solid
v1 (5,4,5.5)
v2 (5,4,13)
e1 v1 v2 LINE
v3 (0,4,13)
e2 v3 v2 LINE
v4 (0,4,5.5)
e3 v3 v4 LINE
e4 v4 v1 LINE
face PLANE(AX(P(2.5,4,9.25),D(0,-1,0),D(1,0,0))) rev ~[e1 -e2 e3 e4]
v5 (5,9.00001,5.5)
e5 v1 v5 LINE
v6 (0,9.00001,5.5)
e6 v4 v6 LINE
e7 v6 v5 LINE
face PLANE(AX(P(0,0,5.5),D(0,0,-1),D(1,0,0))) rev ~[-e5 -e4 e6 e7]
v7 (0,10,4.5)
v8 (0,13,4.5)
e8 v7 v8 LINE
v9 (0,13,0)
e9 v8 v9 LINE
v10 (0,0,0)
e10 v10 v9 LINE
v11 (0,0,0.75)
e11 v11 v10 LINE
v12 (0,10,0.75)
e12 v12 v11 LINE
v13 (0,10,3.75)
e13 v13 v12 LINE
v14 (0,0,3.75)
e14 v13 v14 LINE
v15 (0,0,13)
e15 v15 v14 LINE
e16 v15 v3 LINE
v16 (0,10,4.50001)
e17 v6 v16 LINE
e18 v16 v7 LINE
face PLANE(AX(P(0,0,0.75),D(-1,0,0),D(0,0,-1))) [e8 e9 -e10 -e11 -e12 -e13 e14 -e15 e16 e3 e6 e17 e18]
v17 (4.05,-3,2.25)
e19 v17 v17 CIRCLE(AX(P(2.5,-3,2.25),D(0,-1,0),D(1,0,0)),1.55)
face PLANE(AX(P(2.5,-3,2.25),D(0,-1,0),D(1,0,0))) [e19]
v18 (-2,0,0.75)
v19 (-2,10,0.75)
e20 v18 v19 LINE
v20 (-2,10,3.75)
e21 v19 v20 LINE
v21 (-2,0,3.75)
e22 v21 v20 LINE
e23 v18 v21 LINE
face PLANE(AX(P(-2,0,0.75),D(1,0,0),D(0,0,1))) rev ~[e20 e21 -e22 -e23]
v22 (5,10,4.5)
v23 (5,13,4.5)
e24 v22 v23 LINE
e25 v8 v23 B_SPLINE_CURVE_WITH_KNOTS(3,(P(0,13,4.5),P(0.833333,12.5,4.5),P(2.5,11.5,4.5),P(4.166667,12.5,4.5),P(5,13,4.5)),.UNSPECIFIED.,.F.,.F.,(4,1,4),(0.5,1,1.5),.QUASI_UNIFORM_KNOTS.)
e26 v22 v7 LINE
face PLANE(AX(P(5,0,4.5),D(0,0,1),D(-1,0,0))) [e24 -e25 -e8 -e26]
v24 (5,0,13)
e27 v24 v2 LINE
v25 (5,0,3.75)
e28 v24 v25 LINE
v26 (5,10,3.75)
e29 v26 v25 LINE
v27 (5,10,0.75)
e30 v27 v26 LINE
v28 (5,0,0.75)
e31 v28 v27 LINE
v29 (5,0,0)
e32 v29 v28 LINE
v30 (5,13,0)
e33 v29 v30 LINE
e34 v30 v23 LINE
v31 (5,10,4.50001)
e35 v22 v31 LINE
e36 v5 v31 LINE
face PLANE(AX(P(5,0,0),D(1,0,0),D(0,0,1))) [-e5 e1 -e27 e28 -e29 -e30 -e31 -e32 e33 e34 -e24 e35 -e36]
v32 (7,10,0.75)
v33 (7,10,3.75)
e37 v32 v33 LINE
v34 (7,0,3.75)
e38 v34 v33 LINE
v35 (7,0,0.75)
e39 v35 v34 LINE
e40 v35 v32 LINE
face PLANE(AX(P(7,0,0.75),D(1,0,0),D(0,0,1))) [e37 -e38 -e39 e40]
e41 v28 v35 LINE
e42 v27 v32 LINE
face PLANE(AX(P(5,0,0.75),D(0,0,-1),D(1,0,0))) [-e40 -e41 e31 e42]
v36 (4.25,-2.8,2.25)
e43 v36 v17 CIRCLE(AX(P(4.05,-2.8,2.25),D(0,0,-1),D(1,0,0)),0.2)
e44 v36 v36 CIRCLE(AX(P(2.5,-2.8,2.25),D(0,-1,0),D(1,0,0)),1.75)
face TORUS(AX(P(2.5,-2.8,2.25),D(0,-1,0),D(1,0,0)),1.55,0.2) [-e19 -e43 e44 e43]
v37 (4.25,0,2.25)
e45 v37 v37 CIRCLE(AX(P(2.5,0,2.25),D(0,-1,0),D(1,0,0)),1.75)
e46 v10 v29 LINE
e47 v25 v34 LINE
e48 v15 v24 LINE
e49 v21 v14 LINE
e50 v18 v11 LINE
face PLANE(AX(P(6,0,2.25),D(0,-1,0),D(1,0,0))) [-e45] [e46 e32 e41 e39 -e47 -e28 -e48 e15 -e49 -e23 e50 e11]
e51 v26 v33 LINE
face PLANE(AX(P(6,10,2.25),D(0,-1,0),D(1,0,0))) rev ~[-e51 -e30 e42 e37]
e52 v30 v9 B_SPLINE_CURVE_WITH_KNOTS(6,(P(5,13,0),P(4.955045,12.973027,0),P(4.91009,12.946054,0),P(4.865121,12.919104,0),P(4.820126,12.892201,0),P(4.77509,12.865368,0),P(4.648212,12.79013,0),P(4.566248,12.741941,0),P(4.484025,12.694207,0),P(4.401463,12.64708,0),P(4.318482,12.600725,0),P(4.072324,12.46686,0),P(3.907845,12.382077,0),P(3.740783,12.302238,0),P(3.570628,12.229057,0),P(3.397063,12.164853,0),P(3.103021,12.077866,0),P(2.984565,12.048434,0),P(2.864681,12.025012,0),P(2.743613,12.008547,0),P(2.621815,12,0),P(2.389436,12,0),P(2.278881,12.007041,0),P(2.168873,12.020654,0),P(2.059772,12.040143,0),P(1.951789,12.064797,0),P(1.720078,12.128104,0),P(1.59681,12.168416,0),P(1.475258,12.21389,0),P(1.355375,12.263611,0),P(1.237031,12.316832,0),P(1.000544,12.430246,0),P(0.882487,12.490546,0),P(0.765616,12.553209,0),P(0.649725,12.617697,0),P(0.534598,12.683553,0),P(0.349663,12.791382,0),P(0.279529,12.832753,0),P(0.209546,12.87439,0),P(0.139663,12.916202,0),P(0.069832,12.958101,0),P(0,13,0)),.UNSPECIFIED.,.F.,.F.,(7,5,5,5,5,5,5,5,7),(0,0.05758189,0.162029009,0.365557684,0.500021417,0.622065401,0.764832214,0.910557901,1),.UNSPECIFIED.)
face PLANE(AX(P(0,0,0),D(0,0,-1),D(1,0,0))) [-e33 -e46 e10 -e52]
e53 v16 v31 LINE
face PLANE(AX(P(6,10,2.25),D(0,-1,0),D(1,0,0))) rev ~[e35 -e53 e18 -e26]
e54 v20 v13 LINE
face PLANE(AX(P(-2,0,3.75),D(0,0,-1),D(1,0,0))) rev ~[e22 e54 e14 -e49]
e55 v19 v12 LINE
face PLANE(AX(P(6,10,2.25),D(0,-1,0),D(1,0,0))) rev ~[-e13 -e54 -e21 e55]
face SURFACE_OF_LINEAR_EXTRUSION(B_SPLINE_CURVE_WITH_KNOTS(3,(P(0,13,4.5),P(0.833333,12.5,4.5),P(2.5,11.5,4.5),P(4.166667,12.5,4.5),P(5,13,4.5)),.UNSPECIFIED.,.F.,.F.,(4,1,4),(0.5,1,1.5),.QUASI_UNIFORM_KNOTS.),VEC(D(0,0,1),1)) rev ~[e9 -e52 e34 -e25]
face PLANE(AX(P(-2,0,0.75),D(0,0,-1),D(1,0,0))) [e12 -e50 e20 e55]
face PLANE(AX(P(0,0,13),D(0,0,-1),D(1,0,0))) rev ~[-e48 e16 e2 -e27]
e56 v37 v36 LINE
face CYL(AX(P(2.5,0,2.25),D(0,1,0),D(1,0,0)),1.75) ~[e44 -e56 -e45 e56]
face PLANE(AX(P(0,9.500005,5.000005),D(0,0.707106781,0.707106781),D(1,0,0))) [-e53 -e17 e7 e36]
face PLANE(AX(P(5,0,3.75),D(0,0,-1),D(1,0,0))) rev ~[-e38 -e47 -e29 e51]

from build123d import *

# Parameters (mm, degrees)
F0_W     = 5
F0_H     = 7.5
F0_R     = 1.75
F0_H_2   = 1
F1_DEPTH = 4
F2_DEPTH = 3
F0_W_2   = 2
F0_H_3   = 3
F3_DEPTH = 10
F4_DEPTH = 13
F5_SIZE  = 0.99999
F7_DEPTH = 4.501
F8_R     = 0.2


# Not quite as in the source:
# - a fillet or chamfer is up to 0.001 mm smaller than in the source, because OpenCascade refuses the exact size


with BuildPart() as f1:
    # F0 (on Front) → F1 (new body)
    with BuildSketch(Plane.XZ):
        with Locations((2.5, 9.25)):
            Rectangle(F0_W, F0_H)
        Polygon((0, 0.75), (0, 0), (5, 0), (5, 0.75), (5, 3.75), (5, 4.5), (0, 4.5), (0, 3.75), align=None)
        with Locations((2.5, 2.25)):
            Circle(F0_R, mode=Mode.SUBTRACT)
        with Locations((2.5, 2.25)):
            Circle(F0_R)
        with Locations((2.5, 5)):
            Rectangle(F0_W, F0_H_2)
    extrude(amount=-F1_DEPTH)

    # F0 (on Front) → F2 (join)
    with BuildSketch(Plane.XZ):
        with Locations((2.5, 2.25)):
            Circle(F0_R)
    extrude(amount=F2_DEPTH)

    # F0 (on Front) → F3 (join)
    with BuildSketch(Plane.XZ):
        with Locations((6, 2.25)):
            Rectangle(F0_W_2, F0_H_3)
        with Locations((-1, 2.25)):
            Rectangle(F0_W_2, F0_H_3)
        with Locations((2.5, 5)):
            Rectangle(F0_W, F0_H_2)
        Polygon((0, 0.75), (0, 0), (5, 0), (5, 0.75), (5, 3.75), (5, 4.5), (0, 4.5), (0, 3.75), align=None)
        with Locations((2.5, 2.25)):
            Circle(F0_R, mode=Mode.SUBTRACT)
        with Locations((2.5, 2.25)):
            Circle(F0_R)
    extrude(amount=-F3_DEPTH)

    # F0 (on Front) → F4 (join)
    with BuildSketch(Plane.XZ):
        Polygon((0, 0.75), (0, 0), (5, 0), (5, 0.75), (5, 3.75), (5, 4.5), (0, 4.5), (0, 3.75), align=None)
        with Locations((2.5, 2.25)):
            Circle(F0_R, mode=Mode.SUBTRACT)
        with Locations((2.5, 2.25)):
            Circle(F0_R)
    extrude(amount=-F4_DEPTH)

    # F5 (size 1 in the source; OpenCascade refuses exactly that, so slightly less here)
    f5_edges = [f1.edges().sort_by_distance(p)[0] for p in [
        (2.5, 10, 5.5),
    ]]
    chamfer(f5_edges, length=F5_SIZE)

    # F6 (on face) → F7 (cut, through all)
    with BuildSketch(Plane.XY.offset(4.5)):
        with BuildLine():
            Line((5, 13), (2.5, 13))
            Line((2.5, 13), (2.5, 12))
            add(Edge.make_bspline(
                [(5, 13), (4.1666666667, 12.5), (3.3333333333, 12), (2.5, 12)],
                knots=[0, 0, 0, 0, 0.5, 0.5, 0.5, 0.5], degree=3))
        make_face()
        with BuildLine():
            Line((2.5, 12), (2.5, 13))
            Line((2.5, 13), (0, 13))
            add(Edge.make_bspline(
                [(2.5, 12), (1.6666666667, 12), (0.8333333333, 12.5), (0, 13)],
                knots=[0.5, 0.5, 0.5, 0.5, 1, 1, 1, 1], degree=3))
        make_face()
    extrude(amount=-F7_DEPTH, mode=Mode.SUBTRACT)

    # F8
    f8_edges = [f1.edges().sort_by_distance(p)[0] for p in [
        (0.75, -3, 2.25),
    ]]
    fillet(f8_edges, radius=F8_R)


solid = f1.part
